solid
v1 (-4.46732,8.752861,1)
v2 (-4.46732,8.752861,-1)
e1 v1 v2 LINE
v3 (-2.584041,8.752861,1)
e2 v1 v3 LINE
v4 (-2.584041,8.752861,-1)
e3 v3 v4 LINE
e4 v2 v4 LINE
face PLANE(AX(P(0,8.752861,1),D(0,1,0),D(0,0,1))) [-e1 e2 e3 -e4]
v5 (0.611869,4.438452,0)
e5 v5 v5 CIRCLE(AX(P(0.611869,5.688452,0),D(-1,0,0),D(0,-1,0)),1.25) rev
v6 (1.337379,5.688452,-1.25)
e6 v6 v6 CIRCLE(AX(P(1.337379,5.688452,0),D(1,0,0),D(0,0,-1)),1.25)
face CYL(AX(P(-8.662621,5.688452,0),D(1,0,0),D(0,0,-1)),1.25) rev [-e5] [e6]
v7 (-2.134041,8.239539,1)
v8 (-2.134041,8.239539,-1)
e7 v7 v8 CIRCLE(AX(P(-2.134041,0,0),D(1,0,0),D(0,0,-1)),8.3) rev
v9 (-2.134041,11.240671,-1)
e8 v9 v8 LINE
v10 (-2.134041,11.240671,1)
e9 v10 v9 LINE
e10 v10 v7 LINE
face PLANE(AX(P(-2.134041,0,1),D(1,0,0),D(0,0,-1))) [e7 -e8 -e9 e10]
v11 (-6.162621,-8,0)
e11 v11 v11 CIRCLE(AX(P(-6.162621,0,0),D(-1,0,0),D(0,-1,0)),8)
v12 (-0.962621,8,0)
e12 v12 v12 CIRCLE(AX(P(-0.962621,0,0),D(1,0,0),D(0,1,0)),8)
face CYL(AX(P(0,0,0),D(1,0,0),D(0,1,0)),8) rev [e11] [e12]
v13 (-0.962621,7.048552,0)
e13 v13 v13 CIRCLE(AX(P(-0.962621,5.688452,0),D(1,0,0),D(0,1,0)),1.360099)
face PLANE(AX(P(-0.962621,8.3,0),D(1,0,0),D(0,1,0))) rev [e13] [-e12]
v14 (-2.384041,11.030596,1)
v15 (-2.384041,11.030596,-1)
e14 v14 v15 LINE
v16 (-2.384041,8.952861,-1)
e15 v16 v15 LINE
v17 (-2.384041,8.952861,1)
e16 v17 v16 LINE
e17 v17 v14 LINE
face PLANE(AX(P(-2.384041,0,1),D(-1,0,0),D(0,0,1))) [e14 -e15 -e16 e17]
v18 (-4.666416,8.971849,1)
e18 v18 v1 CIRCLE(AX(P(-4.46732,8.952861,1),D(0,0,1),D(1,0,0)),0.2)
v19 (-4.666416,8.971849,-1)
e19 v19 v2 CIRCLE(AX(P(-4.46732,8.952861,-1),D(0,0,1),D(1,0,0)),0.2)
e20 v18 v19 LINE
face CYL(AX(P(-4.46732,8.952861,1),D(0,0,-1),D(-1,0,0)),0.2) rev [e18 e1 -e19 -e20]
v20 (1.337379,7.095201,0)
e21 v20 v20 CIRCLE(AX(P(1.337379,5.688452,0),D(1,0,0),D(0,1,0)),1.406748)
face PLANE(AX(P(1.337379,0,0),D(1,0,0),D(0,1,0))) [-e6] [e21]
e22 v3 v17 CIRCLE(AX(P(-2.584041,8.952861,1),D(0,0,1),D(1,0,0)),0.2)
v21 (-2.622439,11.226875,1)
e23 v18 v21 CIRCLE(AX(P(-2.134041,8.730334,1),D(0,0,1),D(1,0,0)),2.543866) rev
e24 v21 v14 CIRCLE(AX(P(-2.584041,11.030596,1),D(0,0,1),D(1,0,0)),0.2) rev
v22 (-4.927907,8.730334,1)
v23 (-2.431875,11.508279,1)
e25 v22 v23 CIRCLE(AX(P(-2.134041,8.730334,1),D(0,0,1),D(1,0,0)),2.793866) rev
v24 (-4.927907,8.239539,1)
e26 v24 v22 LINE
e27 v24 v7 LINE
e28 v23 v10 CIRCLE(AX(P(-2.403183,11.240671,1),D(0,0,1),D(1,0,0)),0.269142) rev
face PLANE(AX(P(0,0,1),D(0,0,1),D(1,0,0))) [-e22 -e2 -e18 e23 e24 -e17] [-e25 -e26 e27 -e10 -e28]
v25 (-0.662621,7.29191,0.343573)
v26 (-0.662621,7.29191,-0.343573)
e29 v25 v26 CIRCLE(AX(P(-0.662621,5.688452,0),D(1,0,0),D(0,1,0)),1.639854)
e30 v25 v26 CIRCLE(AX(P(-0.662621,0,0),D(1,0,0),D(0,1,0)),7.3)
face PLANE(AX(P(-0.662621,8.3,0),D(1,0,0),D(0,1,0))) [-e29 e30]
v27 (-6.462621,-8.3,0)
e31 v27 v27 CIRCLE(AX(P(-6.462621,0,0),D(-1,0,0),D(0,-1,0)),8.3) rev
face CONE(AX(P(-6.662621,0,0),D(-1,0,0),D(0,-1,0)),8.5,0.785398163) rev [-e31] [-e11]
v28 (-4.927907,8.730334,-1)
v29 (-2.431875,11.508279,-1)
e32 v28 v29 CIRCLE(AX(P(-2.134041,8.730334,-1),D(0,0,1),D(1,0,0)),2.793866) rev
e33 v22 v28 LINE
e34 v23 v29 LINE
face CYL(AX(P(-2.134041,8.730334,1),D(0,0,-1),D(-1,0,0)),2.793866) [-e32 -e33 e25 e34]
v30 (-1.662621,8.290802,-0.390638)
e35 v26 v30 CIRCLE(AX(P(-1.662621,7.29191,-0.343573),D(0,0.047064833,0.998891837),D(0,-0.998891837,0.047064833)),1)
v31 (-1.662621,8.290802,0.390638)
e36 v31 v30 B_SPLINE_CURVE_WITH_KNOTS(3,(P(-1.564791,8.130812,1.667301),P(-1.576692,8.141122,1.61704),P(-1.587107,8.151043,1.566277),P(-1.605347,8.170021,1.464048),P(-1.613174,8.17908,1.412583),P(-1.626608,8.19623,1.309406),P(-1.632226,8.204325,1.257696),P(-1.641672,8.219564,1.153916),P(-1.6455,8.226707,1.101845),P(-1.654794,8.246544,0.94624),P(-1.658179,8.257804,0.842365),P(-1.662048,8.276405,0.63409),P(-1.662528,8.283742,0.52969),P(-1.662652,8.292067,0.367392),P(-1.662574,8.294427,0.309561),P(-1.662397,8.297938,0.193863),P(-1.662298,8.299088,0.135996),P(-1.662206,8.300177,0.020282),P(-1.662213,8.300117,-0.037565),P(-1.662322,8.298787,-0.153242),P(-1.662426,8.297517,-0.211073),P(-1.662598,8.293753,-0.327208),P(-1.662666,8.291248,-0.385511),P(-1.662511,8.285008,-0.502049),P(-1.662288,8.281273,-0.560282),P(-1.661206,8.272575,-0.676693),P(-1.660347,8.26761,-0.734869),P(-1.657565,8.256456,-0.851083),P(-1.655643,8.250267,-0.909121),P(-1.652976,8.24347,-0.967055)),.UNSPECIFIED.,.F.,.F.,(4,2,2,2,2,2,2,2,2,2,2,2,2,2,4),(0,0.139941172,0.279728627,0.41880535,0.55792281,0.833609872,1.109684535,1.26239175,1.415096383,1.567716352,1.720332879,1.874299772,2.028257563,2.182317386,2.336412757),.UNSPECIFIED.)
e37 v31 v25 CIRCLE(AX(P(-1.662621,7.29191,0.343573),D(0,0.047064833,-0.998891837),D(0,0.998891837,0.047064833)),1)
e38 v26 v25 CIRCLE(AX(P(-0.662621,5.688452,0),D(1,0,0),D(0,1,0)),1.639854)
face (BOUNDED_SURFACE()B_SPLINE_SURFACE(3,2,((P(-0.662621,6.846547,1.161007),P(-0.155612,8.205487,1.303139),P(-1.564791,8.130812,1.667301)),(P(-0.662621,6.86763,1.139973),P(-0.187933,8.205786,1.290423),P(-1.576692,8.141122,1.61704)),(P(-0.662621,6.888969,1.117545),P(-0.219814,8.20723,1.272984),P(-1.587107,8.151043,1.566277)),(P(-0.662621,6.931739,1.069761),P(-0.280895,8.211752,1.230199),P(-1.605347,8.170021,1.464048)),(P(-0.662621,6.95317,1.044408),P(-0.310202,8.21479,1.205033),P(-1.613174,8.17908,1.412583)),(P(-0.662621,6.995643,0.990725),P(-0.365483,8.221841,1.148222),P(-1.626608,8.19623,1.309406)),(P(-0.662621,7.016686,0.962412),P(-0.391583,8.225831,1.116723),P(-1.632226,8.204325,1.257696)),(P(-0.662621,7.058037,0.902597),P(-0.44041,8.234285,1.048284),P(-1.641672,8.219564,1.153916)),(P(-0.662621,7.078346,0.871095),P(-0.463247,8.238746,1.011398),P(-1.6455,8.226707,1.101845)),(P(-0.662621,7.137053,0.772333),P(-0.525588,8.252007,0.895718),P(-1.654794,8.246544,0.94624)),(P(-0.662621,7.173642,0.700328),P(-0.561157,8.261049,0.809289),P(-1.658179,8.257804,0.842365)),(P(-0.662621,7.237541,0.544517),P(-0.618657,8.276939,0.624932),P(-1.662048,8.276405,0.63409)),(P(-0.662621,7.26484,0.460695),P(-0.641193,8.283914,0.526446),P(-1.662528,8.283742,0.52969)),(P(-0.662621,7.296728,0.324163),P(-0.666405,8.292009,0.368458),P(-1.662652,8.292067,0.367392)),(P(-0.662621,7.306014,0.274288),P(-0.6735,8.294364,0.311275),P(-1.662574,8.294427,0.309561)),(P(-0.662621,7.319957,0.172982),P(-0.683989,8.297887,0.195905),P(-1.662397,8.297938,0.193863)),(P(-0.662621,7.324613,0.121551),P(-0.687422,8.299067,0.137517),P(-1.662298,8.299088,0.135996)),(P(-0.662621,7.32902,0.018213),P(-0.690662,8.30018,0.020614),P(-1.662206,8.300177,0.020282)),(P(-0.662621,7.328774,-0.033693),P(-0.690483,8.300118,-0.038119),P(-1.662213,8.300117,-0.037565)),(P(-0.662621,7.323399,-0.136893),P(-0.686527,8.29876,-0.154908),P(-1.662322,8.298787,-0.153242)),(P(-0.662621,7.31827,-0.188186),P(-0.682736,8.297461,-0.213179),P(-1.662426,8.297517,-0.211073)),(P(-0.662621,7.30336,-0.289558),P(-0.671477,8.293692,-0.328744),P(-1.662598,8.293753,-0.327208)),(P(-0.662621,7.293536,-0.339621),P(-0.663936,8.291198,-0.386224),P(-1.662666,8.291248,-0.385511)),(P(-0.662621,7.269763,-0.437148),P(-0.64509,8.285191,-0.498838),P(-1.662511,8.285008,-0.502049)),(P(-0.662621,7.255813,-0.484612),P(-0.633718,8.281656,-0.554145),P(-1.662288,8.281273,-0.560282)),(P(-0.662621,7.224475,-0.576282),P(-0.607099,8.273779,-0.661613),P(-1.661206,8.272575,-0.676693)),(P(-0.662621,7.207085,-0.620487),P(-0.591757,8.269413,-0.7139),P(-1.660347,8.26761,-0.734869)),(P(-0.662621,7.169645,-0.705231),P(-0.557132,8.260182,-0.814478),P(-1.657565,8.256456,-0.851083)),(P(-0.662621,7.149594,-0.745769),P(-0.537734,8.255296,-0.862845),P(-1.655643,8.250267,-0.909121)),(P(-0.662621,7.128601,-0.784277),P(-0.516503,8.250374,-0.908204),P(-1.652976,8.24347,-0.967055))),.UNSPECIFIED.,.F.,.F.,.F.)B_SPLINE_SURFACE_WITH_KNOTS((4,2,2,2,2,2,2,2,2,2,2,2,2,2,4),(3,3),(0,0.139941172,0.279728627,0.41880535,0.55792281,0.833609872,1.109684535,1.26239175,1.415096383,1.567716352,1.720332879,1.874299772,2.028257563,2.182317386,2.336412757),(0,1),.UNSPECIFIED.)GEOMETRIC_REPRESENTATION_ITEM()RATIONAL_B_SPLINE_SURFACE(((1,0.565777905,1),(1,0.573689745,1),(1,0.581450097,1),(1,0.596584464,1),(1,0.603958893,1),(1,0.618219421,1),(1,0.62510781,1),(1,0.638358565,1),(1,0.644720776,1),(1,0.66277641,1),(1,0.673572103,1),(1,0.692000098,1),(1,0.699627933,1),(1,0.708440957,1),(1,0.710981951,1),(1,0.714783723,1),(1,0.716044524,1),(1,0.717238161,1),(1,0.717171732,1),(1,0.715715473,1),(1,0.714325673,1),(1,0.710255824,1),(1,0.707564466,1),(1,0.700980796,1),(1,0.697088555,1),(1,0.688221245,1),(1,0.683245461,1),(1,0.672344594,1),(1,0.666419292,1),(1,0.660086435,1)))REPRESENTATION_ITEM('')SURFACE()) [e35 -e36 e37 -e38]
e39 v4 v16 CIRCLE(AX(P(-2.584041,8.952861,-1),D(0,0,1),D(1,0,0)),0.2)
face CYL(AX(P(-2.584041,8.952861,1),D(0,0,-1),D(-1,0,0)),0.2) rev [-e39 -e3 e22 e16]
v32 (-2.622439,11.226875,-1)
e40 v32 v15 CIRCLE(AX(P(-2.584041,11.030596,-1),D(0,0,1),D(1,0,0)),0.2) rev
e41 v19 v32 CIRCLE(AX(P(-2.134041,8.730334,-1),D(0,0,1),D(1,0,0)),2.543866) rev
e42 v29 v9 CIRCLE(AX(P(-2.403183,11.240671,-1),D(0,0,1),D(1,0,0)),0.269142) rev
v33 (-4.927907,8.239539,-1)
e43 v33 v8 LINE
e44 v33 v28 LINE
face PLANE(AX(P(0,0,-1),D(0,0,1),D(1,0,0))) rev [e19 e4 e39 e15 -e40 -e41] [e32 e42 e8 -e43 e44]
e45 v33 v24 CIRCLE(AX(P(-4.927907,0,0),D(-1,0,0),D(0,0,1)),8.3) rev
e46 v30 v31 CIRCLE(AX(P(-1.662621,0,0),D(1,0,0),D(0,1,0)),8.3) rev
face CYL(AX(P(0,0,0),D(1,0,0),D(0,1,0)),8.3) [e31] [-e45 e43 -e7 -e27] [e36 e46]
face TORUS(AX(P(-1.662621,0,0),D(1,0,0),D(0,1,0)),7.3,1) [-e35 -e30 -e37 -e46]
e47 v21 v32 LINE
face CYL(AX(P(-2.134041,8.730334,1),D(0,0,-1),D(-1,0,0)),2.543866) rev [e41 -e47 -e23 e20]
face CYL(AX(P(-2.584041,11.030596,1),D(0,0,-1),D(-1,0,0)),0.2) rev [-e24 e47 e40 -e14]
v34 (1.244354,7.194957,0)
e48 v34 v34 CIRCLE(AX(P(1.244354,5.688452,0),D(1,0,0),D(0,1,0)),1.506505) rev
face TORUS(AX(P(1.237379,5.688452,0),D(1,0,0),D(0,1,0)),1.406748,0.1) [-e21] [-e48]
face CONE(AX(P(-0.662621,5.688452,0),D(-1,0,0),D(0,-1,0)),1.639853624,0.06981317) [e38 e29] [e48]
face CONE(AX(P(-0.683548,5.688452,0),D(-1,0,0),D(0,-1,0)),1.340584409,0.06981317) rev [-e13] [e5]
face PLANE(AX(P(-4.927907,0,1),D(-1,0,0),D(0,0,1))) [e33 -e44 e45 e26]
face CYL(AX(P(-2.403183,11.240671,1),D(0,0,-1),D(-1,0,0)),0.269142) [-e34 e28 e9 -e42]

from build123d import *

# Parameters (mm, degrees)
SKETCH2_W           = 6
SKETCH2_H           = 8.3
SHELL1_T            = -0.3
SKETCH5_R           = 1.25
CUT_EXTRUDE1_DEPTH  = 10
FILLET1_R           = 1
FILLET2_R           = 0.1
CHAMFER1_SIZE       = 0.5
BOSS_EXTRUDE1_DEPTH = 1


with BuildPart() as part:
    # Sketch2 → Revolve1 (revolve)
    with BuildSketch(Plane.XY):
        with Locations((-3.662621359, 4.15)):
            Rectangle(SKETCH2_W, SKETCH2_H)
    revolve(axis=Axis((0, 0, 0), (-1, 0, 0)))

    # Sketch3 → Revolve2 (revolve)
    with BuildSketch(Plane.XY, mode=Mode.PRIVATE) as revolve2_sk:
        Polygon((1.337378641, 7.188452486), (-0.662621359, 7.328306109), (-0.662621359, 5.688452486), (1.337378641, 5.688452486), align=None)
    revolve(revolve2_sk.sketch.rotate(Axis((-0.662621359, 5.688452486, 0), (1, 0, 0)), 180), axis=Axis((-0.662621359, 5.688452486, 0), (1, 0, 0)))

    # Shell1
    shell1_openings = [part.faces().sort_by_distance(p)[0] for p in [
        (-6.662621359, 0, 0),
    ]]
    offset(amount=SHELL1_T, openings=shell1_openings, kind=Kind.INTERSECTION)

    # Sketch5 → Cut-Extrude1 (cut)
    with BuildSketch(Plane(origin=(1.337378641, 0, 0), x_dir=(0, 0, -1), z_dir=(1, 0, 0))):
        with Locations((0, 5.688452486)):
            Circle(SKETCH5_R)
    extrude(amount=-CUT_EXTRUDE1_DEPTH, mode=Mode.SUBTRACT)

    # Fillet1
    fillet1_edges = [part.edges().sort_by_distance(p)[0] for p in [
        (-0.662621359, -8.3, 0),
    ]]
    fillet(fillet1_edges, radius=FILLET1_R)

    # Fillet2
    fillet2_edges = [part.edges().sort_by_distance(p)[0] for p in [
        (1.337378641, 7.188452486, 0),
    ]]
    fillet(fillet2_edges, radius=FILLET2_R)

    # Chamfer1
    # the kernel refuses this chamfer: 0.5 mm, written as the material it takes off along each edge
    with BuildSketch(Plane(origin=(-6.662621359, 0, 0), x_dir=(0, 1, 0), z_dir=(0, 0, -1))) as chamfer1_piece_1:
        Polygon((8 + CHAMFER1_SIZE, 0), (8, CHAMFER1_SIZE), (8, 0), align=None)
    revolve(axis=Axis((-6.662621359, 0, 0), (1, 0, 0)), mode=Mode.SUBTRACT)

    # Sketch6 → Boss-Extrude1 (add, symmetric)
    with BuildSketch(Plane.XY):
        with BuildLine():
            Line((-4.927907027, 8.3), (-4.927907027, 8.730333701))
            ThreePointArc((-4.927907027, 8.730333701), (-4.212236683, 10.597628426), (-2.431874659, 11.508279126))
            ThreePointArc((-2.431874659, 11.508279126), (-2.223300905, 11.440869947), (-2.134041341, 11.2406707))
            Line((-2.134041341, 11.2406707), (-2.134041341, 8.115869894))
            Line((-2.134041341, 8.115869894), (-4.927907027, 8.115869894))
            Line((-4.927907027, 8.115869894), (-4.927907027, 7.714440325))
            Line((-4.927907027, 7.714440325), (-4.927907027, 8.3))
        make_face()
        with BuildLine():
            Line((-4.467319737, 8.752860733), (-2.584041341, 8.752860733))
            ThreePointArc((-2.584041341, 8.752860733), (-2.442619985, 8.811439376), (-2.384041341, 8.952860733))
            Line((-2.384041341, 8.952860733), (-2.384041341, 11.030595936))
            ThreePointArc((-2.384041341, 11.030595936), (-2.456918607, 11.184997395), (-2.622439446, 11.226875292))
            ThreePointArc((-2.622439446, 11.226875292), (-4.018863264, 10.438753715), (-4.666416333, 8.971848769))
            ThreePointArc((-4.666416333, 8.971848769), (-4.61530218, 8.818320046), (-4.467319737, 8.752860733))
        make_face(mode=Mode.SUBTRACT)
    extrude(amount=BOSS_EXTRUDE1_DEPTH, both=True)


solid = part.part
